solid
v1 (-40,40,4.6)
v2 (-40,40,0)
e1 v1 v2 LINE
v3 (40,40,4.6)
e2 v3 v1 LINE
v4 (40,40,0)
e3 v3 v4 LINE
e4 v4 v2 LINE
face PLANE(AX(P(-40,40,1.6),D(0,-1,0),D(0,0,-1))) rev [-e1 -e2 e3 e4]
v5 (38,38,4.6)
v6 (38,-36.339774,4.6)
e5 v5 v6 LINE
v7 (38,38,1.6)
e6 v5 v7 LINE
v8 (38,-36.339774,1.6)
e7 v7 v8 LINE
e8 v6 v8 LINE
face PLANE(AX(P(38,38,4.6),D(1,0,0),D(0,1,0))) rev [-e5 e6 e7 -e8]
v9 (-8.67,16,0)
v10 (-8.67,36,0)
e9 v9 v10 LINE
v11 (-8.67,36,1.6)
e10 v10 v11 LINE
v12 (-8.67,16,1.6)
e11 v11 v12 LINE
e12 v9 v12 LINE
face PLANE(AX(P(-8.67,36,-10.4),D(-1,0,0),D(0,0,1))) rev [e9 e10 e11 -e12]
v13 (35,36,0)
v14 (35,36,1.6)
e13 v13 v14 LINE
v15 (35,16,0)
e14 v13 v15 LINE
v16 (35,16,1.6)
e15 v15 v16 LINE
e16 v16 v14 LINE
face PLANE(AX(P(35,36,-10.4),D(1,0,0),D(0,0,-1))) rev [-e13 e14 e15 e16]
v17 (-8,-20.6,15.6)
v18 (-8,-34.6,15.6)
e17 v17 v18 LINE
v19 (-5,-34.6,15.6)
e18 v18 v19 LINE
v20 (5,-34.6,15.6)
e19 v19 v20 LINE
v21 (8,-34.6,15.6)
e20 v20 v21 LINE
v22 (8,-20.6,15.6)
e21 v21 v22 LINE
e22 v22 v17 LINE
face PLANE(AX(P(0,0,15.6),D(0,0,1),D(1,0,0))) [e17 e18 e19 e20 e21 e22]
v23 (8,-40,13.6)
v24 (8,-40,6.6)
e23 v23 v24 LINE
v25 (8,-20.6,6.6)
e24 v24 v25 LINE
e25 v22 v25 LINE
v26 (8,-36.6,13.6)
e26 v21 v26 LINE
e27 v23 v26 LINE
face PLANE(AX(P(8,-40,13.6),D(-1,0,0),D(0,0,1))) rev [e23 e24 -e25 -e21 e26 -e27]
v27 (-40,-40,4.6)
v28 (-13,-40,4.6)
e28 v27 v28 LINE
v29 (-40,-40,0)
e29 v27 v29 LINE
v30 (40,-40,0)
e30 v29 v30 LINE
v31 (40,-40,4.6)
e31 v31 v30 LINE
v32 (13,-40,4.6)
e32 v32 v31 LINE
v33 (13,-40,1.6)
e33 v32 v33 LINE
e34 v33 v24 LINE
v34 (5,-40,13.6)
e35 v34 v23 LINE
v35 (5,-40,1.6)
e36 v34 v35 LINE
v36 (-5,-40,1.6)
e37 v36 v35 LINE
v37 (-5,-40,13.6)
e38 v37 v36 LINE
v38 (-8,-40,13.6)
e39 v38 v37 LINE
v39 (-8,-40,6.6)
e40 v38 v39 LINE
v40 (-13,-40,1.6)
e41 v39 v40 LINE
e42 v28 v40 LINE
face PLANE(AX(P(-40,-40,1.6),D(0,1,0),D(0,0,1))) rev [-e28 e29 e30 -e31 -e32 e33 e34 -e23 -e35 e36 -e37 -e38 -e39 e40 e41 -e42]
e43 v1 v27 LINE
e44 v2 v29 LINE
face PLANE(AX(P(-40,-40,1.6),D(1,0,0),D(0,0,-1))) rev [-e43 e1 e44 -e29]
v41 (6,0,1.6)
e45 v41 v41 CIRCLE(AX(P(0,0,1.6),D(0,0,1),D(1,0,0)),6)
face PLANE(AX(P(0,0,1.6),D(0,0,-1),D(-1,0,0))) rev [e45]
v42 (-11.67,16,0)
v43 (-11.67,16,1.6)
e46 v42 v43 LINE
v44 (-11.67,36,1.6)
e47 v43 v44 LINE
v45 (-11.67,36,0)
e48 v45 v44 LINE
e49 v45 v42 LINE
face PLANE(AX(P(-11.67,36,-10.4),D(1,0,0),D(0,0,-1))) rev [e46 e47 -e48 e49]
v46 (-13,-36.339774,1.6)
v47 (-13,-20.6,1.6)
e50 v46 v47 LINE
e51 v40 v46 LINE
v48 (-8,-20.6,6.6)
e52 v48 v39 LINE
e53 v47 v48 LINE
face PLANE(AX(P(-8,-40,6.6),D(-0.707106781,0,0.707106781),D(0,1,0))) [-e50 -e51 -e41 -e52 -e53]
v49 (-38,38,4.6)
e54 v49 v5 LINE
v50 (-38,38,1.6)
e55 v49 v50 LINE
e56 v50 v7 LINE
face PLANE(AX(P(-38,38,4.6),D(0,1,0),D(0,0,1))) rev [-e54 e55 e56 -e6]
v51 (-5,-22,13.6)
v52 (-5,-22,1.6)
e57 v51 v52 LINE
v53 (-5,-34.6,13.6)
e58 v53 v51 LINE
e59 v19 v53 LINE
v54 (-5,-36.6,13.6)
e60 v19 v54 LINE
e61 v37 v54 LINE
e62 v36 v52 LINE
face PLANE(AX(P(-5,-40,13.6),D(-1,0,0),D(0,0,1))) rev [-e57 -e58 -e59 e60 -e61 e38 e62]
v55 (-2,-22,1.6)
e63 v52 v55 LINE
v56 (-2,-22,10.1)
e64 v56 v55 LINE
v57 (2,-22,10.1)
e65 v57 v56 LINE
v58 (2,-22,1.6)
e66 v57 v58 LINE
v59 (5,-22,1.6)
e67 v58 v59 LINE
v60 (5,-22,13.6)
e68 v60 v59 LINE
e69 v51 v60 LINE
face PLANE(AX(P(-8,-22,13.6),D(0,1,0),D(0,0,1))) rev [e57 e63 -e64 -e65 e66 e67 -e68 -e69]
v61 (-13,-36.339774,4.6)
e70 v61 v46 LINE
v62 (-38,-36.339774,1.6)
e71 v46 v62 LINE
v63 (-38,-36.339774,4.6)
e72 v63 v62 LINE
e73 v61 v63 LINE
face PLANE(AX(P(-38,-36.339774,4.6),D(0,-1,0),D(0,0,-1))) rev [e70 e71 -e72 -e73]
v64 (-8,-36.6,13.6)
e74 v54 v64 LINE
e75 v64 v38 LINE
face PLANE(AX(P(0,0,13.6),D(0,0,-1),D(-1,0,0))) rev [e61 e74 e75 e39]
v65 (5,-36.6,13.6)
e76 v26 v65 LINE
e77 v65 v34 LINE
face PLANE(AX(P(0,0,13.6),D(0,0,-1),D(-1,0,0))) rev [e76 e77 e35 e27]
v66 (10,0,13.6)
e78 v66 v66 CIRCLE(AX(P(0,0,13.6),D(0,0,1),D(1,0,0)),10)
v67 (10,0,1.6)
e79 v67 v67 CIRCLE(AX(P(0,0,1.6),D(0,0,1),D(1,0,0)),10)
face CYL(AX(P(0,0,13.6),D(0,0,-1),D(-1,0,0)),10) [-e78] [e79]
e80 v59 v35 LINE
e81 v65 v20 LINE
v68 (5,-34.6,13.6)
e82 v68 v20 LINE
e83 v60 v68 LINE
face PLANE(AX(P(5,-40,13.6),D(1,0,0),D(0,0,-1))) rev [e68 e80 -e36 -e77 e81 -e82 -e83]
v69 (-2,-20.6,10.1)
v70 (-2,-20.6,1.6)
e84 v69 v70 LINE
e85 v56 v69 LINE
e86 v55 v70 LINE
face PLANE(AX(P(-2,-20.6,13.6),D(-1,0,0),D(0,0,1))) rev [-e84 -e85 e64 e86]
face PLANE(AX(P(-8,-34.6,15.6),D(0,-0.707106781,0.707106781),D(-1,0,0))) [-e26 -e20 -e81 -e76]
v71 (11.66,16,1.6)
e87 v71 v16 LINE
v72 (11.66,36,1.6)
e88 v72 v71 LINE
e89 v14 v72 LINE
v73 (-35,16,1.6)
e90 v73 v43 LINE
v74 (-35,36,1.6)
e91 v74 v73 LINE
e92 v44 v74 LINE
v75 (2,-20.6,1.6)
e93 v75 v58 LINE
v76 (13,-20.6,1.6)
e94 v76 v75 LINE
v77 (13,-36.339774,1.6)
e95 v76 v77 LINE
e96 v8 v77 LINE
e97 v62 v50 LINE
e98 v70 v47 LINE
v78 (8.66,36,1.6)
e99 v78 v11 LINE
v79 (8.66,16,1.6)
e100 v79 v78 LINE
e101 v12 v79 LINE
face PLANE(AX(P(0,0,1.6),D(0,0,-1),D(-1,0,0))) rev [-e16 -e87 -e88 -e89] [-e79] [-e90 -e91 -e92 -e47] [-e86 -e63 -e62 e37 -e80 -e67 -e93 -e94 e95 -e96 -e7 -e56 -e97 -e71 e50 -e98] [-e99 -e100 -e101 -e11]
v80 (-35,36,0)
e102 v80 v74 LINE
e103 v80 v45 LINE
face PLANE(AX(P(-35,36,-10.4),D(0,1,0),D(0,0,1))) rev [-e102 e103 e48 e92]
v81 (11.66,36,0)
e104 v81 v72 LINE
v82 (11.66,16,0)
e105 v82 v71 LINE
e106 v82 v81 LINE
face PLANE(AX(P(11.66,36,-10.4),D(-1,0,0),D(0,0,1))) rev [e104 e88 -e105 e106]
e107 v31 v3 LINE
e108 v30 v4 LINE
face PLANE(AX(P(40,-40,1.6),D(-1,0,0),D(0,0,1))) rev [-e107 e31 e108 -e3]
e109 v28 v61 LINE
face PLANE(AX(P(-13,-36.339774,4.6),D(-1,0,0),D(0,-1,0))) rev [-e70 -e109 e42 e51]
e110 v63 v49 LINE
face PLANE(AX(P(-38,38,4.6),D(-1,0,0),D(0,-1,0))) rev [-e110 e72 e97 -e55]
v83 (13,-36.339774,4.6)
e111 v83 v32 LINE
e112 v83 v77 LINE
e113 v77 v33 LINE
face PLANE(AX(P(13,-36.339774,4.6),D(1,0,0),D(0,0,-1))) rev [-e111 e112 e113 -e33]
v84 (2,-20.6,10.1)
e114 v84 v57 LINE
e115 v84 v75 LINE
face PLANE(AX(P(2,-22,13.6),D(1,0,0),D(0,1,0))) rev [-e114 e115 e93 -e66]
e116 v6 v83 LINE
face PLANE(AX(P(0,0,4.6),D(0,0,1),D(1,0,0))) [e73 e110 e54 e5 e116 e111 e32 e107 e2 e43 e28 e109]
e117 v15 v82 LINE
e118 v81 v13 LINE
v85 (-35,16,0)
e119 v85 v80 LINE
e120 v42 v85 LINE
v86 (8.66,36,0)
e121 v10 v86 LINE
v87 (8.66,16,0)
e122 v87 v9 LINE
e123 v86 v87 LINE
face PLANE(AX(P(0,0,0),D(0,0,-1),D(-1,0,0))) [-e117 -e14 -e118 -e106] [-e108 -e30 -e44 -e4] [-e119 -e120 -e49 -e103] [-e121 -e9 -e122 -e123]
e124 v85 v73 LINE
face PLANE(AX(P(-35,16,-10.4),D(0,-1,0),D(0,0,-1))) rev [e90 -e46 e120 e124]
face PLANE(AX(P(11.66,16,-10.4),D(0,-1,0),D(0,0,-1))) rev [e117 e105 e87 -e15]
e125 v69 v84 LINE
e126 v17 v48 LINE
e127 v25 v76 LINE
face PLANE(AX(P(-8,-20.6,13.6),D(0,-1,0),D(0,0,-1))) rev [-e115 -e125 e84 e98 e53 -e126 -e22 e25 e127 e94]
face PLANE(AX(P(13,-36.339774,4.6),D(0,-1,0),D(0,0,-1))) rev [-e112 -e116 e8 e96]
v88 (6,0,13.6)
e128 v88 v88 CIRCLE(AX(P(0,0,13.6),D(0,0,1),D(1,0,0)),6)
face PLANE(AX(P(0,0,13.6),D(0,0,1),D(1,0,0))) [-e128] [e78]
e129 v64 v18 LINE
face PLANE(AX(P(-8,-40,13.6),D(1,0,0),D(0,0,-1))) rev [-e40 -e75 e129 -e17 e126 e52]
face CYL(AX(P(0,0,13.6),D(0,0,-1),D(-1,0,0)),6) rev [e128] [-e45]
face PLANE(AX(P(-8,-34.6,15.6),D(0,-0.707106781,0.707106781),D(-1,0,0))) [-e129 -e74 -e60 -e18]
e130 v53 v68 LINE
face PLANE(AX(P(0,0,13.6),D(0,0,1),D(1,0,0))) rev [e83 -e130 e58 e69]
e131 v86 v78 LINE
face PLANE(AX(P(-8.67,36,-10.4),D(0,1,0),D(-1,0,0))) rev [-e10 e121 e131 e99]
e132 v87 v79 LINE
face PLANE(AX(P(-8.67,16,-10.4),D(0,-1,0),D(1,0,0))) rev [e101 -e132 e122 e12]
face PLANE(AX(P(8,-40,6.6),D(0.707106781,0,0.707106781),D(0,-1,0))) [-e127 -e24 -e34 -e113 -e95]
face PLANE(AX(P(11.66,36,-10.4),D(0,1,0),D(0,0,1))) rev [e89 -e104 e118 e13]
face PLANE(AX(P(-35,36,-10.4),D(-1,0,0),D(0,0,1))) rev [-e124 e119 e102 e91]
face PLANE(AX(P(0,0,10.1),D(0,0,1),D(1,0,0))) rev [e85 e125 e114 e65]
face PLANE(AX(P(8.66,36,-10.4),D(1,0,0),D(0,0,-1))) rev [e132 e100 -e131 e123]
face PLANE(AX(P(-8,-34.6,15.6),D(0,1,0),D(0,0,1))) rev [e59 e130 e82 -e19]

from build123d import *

# Parameters (mm, degrees)
SKETCH1_W           = 80
SKETCH1_H           = 80
BOSS_EXTRUDE1_DEPTH = 1.6
SKETCH2_R           = 10
SKETCH2_R_2         = 6
BOSS_EXTRUDE2_DEPTH = 12
SKETCH3_W           = 23.33
SKETCH3_H           = 20
SKETCH3_W_2         = 23.34
SKETCH3_W_3         = 17.33
CUT_EXTRUDE1_DEPTH  = 12
BOSS_EXTRUDE3_DEPTH = 12
SKETCH5_W           = 6
SKETCH5_H           = 1.4
BOSS_EXTRUDE4_DEPTH = 12
SKETCH6_W           = 16
SKETCH6_H           = 14
BOSS_EXTRUDE5_DEPTH = 2
CHAMFER1_SIZE       = 2
SKETCH7_W           = 4
SKETCH7_H           = 1.4
BOSS_EXTRUDE6_DEPTH = 3.5
CHAMFER2_SIZE       = 5
BOSS_EXTRUDE7_DEPTH = 3


with BuildPart() as part:
    # Sketch1 → Boss-Extrude1 (new body)
    with BuildSketch(Plane.XY):
        Rectangle(SKETCH1_W, SKETCH1_H)
    extrude(amount=BOSS_EXTRUDE1_DEPTH)

    # Sketch2 → Boss-Extrude2 (add)
    with BuildSketch(Plane.XY.offset(1.6)):
        Circle(SKETCH2_R)
        Circle(SKETCH2_R_2, mode=Mode.SUBTRACT)
    extrude(amount=BOSS_EXTRUDE2_DEPTH)

    # Sketch3 → Cut-Extrude1 (cut)
    with BuildSketch(Plane.XY.offset(1.6)):
        with Locations((-23.335, 26)):
            Rectangle(SKETCH3_W, SKETCH3_H)
        with Locations((23.33, 26)):
            Rectangle(SKETCH3_W_2, SKETCH3_H)
        with Locations((-0.005, 26)):
            Rectangle(SKETCH3_W_3, SKETCH3_H)
    extrude(amount=-CUT_EXTRUDE1_DEPTH, mode=Mode.SUBTRACT)

    # Sketch4 → Boss-Extrude3 (add)
    with BuildSketch(Plane.XY.offset(1.6)):
        Polygon((-5, -40), (-5, -25), (-5, -22), (-8, -22), (-8, -40), align=None)
        Polygon((5, -40), (5, -25), (5, -22), (8, -22), (8, -40), align=None)
    extrude(amount=BOSS_EXTRUDE3_DEPTH)

    # Sketch5 → Boss-Extrude4 (add)
    with BuildSketch(Plane.XY.offset(1.6)):
        with Locations((-5, -21.3)):
            Rectangle(SKETCH5_W, SKETCH5_H)
        with Locations((5, -21.3)):
            Rectangle(SKETCH5_W, SKETCH5_H)
    extrude(amount=BOSS_EXTRUDE4_DEPTH)

    # Sketch6 → Boss-Extrude5 (add)
    with BuildSketch(Plane.XY.offset(13.6)):
        with Locations((0, -27.6)):
            Rectangle(SKETCH6_W, SKETCH6_H)
    extrude(amount=BOSS_EXTRUDE5_DEPTH)

    # Chamfer1
    chamfer1_edges = [part.edges().sort_by_distance(p)[0] for p in [
        (6.5, -34.6, 13.6),
        (-6.5, -34.6, 13.6),
    ]]
    chamfer(chamfer1_edges, length=CHAMFER1_SIZE - 0.0001)  # a hair under: the kernel refuses the full size

    # Sketch7 → Boss-Extrude6 (add)
    with BuildSketch(Plane(origin=(0, 0, 13.6), x_dir=(-1, 0, 0), z_dir=(0, 0, -1))):
        with Locations((0, -21.3)):
            Rectangle(SKETCH7_W, SKETCH7_H)
    extrude(amount=BOSS_EXTRUDE6_DEPTH)

    # Chamfer2
    chamfer2_edges = [part.edges().sort_by_distance(p)[0] for p in [
        (8, -30.3, 1.6),
        (-8, -30.3, 1.6),
    ]]
    chamfer(chamfer2_edges, length=CHAMFER2_SIZE)

    # Sketch8 → Boss-Extrude7 (add)
    with BuildSketch(Plane.XY.offset(1.6)):
        Polygon((-13, -36.339774094), (-13, -40), (-40, -40), (-40, 40), (40, 40), (40, -40), (13, -40), (13, -36.339774094), (38, -36.339774094), (38, 38), (-38, 38), (-38, -36.339774094), align=None)
    extrude(amount=BOSS_EXTRUDE7_DEPTH)


solid = part.part
